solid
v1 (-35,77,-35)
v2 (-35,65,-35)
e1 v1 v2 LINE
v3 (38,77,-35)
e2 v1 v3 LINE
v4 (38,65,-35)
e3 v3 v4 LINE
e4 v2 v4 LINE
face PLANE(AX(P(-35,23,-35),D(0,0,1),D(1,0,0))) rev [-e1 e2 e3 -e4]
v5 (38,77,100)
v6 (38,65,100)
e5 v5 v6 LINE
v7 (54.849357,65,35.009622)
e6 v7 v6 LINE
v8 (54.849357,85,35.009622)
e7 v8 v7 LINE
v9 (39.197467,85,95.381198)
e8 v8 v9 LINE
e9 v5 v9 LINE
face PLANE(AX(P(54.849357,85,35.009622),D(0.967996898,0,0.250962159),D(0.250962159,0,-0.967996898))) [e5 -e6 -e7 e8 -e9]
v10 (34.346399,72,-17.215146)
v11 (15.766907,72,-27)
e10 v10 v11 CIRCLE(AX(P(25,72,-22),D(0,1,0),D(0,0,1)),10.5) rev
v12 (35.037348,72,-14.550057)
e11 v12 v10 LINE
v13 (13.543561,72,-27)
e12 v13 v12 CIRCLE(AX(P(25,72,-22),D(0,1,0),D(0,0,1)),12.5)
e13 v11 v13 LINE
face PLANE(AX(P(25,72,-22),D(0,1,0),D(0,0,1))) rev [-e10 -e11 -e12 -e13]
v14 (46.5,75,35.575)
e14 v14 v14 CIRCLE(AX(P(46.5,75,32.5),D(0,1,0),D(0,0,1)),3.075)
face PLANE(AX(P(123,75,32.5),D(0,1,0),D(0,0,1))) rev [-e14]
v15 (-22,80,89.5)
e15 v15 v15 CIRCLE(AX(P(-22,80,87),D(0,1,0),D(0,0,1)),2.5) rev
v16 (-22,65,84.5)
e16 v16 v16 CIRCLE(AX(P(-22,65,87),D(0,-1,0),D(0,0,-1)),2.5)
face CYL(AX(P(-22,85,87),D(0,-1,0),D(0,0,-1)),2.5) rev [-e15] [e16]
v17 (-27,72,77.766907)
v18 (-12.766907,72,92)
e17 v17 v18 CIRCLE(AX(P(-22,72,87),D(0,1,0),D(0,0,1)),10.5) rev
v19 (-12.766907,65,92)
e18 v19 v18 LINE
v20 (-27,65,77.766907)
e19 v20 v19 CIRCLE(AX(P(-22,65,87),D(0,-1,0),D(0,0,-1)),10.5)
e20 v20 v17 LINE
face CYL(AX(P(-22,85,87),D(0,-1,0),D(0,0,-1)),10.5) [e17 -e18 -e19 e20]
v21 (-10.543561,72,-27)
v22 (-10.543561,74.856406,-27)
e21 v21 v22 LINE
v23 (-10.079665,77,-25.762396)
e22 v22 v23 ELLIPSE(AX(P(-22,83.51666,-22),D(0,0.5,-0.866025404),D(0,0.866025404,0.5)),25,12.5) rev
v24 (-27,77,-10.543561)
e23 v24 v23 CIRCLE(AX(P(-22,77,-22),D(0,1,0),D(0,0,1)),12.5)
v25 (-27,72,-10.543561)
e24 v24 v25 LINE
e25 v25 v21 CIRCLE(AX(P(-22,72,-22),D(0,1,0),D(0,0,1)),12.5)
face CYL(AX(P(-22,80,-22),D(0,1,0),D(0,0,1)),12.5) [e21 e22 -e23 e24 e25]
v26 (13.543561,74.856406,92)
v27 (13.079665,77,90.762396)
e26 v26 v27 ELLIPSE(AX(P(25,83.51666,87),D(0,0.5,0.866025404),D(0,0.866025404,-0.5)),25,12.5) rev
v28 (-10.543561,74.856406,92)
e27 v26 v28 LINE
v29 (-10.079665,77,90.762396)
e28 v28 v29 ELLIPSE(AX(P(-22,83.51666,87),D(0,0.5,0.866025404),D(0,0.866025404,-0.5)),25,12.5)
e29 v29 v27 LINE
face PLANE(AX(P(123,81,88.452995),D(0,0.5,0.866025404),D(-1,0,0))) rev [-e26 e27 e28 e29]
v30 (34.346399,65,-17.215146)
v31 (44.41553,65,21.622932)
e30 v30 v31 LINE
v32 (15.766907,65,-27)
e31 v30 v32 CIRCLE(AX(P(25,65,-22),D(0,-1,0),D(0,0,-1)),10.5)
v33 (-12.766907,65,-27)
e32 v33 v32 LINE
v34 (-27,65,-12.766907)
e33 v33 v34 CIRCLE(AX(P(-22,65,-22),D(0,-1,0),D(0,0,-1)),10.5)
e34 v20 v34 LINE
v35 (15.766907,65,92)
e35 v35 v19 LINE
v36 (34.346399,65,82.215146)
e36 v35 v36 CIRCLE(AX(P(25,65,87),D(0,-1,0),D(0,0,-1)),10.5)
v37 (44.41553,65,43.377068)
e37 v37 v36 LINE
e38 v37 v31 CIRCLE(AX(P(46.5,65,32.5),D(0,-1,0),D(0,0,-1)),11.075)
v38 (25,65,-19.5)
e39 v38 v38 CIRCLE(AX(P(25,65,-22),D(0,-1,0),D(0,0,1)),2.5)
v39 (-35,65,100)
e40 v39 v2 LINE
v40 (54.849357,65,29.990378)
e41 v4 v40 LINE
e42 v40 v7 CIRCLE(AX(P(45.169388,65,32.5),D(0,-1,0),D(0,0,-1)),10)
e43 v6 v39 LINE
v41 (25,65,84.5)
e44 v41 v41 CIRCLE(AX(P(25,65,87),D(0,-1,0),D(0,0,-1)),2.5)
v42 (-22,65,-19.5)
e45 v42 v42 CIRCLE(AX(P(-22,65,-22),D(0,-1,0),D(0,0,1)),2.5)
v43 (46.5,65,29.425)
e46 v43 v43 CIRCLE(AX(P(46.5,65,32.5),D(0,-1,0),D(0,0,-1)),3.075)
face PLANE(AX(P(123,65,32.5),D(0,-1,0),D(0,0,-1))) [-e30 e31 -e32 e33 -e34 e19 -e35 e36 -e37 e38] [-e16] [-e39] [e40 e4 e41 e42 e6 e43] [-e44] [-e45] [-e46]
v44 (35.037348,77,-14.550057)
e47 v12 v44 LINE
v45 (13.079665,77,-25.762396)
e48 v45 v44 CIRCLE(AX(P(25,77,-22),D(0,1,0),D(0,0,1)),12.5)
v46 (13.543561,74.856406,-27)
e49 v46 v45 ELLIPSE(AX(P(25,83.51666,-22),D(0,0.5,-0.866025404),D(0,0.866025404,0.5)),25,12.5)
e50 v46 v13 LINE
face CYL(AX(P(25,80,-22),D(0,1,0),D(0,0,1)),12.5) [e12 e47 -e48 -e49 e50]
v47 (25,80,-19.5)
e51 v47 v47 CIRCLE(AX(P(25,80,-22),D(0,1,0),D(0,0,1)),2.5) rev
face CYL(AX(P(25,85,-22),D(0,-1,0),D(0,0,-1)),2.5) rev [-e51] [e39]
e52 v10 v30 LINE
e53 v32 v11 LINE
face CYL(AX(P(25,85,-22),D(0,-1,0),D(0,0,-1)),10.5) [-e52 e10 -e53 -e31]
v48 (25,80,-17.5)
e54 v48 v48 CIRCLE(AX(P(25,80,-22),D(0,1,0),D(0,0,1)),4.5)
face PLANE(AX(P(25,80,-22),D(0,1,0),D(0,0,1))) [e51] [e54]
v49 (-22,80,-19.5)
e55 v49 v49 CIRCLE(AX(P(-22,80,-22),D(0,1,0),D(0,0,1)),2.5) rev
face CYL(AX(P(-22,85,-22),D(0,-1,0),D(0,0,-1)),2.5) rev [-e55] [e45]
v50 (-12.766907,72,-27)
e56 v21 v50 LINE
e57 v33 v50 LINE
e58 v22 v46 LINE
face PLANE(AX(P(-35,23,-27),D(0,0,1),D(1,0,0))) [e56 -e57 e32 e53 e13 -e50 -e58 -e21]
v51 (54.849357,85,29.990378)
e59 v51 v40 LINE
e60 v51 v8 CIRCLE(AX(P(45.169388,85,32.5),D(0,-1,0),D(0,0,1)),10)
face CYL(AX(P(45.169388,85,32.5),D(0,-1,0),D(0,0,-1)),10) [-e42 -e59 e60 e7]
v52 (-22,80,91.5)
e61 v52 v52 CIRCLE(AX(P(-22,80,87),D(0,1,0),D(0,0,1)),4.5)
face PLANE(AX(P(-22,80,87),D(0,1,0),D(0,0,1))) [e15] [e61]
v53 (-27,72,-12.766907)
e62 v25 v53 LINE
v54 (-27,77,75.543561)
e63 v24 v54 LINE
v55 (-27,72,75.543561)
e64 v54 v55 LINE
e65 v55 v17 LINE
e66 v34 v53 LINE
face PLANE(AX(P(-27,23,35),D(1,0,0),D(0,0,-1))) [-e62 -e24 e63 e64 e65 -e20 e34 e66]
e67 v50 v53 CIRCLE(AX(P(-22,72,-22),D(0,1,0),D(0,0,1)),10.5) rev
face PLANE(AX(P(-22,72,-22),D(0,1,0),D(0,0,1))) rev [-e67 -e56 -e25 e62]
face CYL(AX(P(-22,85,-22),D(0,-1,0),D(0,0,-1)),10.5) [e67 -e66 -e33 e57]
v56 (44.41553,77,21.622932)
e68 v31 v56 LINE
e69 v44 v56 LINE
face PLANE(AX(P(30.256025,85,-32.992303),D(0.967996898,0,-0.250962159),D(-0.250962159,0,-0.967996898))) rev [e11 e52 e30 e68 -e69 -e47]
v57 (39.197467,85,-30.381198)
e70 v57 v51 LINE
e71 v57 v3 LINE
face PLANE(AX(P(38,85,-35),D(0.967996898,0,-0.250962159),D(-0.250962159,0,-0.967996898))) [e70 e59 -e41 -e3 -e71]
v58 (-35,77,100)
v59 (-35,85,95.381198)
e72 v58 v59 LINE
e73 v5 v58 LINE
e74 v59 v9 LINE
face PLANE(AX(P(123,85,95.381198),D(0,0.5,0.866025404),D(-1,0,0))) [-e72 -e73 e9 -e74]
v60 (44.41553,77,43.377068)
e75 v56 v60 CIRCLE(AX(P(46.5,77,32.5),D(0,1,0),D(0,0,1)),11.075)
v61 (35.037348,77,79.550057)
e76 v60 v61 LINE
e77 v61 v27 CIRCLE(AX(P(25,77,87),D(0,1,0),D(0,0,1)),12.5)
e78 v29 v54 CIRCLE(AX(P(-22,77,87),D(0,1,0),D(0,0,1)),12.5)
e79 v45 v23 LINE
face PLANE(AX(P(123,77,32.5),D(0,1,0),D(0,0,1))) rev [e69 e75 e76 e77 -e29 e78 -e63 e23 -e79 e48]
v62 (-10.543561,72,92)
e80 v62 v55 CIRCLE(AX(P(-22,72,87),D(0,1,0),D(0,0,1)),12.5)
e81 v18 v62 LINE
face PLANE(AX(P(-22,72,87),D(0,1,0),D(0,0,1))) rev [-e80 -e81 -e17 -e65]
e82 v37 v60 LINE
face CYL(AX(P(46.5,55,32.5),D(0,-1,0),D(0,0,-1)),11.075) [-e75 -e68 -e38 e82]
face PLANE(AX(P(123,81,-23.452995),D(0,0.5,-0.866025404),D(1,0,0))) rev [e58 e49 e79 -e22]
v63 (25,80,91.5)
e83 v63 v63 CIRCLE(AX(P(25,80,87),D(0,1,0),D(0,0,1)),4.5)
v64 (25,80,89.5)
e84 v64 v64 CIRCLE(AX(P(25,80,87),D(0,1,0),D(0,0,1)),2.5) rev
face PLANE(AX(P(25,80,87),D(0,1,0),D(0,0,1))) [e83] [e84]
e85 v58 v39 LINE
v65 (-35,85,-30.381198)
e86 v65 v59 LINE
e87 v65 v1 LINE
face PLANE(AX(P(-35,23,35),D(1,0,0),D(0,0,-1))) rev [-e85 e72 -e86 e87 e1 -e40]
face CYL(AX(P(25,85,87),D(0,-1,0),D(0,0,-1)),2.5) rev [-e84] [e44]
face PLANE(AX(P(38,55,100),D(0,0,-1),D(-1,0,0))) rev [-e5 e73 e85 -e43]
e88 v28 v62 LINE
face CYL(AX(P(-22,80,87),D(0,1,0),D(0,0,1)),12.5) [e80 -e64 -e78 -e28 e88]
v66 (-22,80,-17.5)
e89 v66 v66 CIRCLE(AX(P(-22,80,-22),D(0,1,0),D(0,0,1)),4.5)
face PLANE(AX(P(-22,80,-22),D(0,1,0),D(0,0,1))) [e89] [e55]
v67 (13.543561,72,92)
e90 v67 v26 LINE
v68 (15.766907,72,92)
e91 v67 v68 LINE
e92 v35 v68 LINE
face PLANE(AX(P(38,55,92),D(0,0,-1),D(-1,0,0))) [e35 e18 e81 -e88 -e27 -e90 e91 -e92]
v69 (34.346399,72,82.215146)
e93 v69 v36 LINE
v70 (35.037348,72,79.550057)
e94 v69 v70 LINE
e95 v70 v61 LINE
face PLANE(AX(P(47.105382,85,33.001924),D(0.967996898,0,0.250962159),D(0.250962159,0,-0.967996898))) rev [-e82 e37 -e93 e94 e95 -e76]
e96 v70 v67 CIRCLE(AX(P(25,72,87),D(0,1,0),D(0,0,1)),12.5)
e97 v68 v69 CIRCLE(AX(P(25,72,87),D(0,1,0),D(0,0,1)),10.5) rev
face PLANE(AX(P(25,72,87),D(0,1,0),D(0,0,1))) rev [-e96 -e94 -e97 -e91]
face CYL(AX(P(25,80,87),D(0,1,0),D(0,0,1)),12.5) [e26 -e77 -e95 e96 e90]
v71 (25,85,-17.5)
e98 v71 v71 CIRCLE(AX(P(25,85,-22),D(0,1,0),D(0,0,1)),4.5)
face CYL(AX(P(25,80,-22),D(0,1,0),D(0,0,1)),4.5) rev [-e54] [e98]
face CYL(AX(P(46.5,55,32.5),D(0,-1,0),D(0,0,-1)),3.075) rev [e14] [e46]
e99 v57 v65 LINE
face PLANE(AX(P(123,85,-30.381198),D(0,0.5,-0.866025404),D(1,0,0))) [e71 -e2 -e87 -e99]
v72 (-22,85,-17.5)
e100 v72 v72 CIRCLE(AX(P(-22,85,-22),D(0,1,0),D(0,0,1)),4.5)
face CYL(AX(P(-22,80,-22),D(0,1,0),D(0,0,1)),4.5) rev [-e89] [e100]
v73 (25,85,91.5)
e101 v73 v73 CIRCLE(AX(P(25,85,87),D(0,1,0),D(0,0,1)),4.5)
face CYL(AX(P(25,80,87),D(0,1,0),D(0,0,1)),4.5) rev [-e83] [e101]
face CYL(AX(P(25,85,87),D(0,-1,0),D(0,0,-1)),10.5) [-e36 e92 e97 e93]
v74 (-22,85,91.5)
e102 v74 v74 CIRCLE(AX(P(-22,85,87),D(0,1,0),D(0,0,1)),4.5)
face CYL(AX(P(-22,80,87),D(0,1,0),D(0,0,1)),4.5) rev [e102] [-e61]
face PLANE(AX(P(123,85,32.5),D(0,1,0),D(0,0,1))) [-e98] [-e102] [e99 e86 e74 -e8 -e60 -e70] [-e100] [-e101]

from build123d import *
from OCP.BRepFilletAPI import BRepFilletAPI_MakeChamfer

# Parameters (mm, degrees)
SALIENTE_EXTRUIR2_DEPTH     = 23
CROQUIS7_R                  = 20
CORTAR_EXTRUIR1_DEPTH       = 16
CROQUIS8_R                  = 10.25
CORTAR_EXTRUIR2_DEPTH       = 65.838641661
SALIENTE_EXTRUIR3_START     = 32
CROQUIS9_R                  = 20
CROQUIS9_R_2                = 3.075
CROQUIS9_R_3                = 10.25
SALIENTE_EXTRUIR3_DEPTH     = 32
CORTAR_EXTRUIR3_START       = -7
CROQUIS10_R                 = 20
CORTAR_EXTRUIR3_DEPTH       = 112.607172695
SALIENTE_EXTRUIR4_START     = 20
CROQUIS11_R                 = 3.075
CROQUIS11_R_2               = 20
SALIENTE_EXTRUIR4_DEPTH     = 20
CROQUIS12_R                 = 63
CORTAR_EXTRUIR4_DEPTH       = 3
CROQUIS13_R                 = 55
CORTAR_EXTRUIR5_DEPTH       = 10
SALIENTE_EXTRUIR5_START     = 10
SALIENTE_EXTRUIR5_DEPTH     = 10
CHAFL_N1_SIZE               = 8
CHAFL_N1_SIZE2              = 4.618802154
CROQUIS15_R                 = 6
CORTAR_EXTRUIR6_DEPTH       = 14.8
CORTAR_EXTRUIR7_REACH       = 233.334
CROQUIS17_R                 = 1.5
CORTAR_EXTRUIR9_REACH       = 225.907
CROQUIS19_R                 = 1.5
CORTAR_EXTRUIR10_START      = -50
CORTAR_EXTRUIR10_DEPTH      = 50
CROQUIS22_R                 = 3
CORTAR_EXTRUIR12_DEPTH      = 3
CROQUIS23_R                 = 3
CORTAR_EXTRUIR13_DEPTH      = 3
CROQUIS25_R                 = 2.5
CORTAR_EXTRUIR15_DEPTH      = 30
CROQUIS24_R                 = 2.5
CORTAR_EXTRUIR14_DEPTH      = 30
CROQUIS26_R                 = 2
CORTAR_EXTRUIR16_DEPTH      = 223.070371729
CROQUIS27_R                 = 3.5
CORTAR_EXTRUIR17_DEPTH      = 5
CORTAR_EXTRUIR18_DEPTH      = 3.25
CORTAR_EXTRUIR20_DEPTH      = 223.070371729
CORTAR_EXTRUIR20_DEPTH_BACK = 10
CROQUIS31_R                 = 2.5
CORTAR_EXTRUIR21_DEPTH      = 217.079267863
CROQUIS32_R                 = 4.5
CORTAR_EXTRUIR22_DEPTH      = 5
SALIENTE_EXTRUIR6_START     = 4
CROQUIS33_R                 = 55
CROQUIS33_R_2               = 6
SALIENTE_EXTRUIR6_DEPTH     = 4
SALIENTE_EXTRUIR7_START     = 3.35
CROQUIS34_R                 = 16.85
CROQUIS34_R_2               = 6
SALIENTE_EXTRUIR7_DEPTH     = 3.35
SALIENTE_EXTRUIR8_START     = 29
CROQUIS35_R                 = 10
CROQUIS35_R_2               = 6
SALIENTE_EXTRUIR8_DEPTH     = 29
CORTAR_EXTRUIR23_DEPTH      = 218.721088781
CORTAR_EXTRUIR23_DEPTH_BACK = 218.721088781
CROQUIS36_OUTSIDE_W         = 281.136
CROQUIS36_OUTSIDE_H         = 190.636
SALIENTE_EXTRUIR9_REACH     = 117.947
CROQUIS37_R                 = 20
VACIADO1_START              = 65
VACIADO1_DEPTH              = 12
VACIADO1_2_DEPTH            = 7
VACIADO1_START_2            = -12.766907344
VACIADO1_3_DEPTH            = 28.533814688


with BuildPart() as part:
    # Croquis2 → Saliente-Extruir2 (new body)
    with BuildSketch(Plane(origin=(0, 0, 0), x_dir=(1, 0, 0), z_dir=(0, 1, 0))):
        with BuildLine():
            Line((32.725022686, -35), (-35, -35))
            Line((-35, -35), (-35, 35))
            Line((-35, 35), (38, 35))
            Line((38, 35), (52.182846342, -19.705264464))
            ThreePointArc((52.182846342, -19.705264464), (38.869791903, -20.762030653), (32.5, -32.5))
            ThreePointArc((32.5, -32.5), (32.556369153, -33.755053307), (32.725022686, -35))
        make_face()
    extrude(amount=SALIENTE_EXTRUIR2_DEPTH)

    # Croquis7 → Cortar-Extruir1 (cut)
    with BuildSketch(Plane(origin=(0, 23, 0), x_dir=(1, 0, 0), z_dir=(0, 1, 0))):
        with Locations(Location((1.5, -1.5, 0), (0, 0, 270))):
            Circle(CROQUIS7_R)
    extrude(amount=-CORTAR_EXTRUIR1_DEPTH, mode=Mode.SUBTRACT)

    # Croquis8 → Cortar-Extruir2 (cut, through all)
    with BuildSketch(Plane(origin=(0, 7, 0), x_dir=(1, 0, 0), z_dir=(0, 1, 0))):
        with Locations(Location((1.5, -1.5, 0), (0, 0, 270))):
            Circle(CROQUIS8_R)
    extrude(amount=-CORTAR_EXTRUIR2_DEPTH, mode=Mode.SUBTRACT)

    # Croquis9 → Saliente-Extruir3 (add)
    with BuildSketch(Plane(origin=(0, 23, 0), x_dir=(1, 0, 0), z_dir=(0, 1, 0)).offset(SALIENTE_EXTRUIR3_START)):
        with BuildLine():
            Line((-35, 35), (-35, -100))
            Line((-35, -100), (38, -100))
            Line((38, -100), (54.849357366, -35.009621588))
            ThreePointArc((54.849357366, -35.009621588), (55.169388384, -32.5), (54.849357366, -29.990378412))
            Line((54.849357366, -29.990378412), (38, 35))
            Line((38, 35), (-35, 35))
        make_face()
        with Locations(Location((1.5, -1.5, 0), (0, 0, 270))):
            Circle(CROQUIS9_R, mode=Mode.SUBTRACT)
        with Locations(Location((46.5, -32.5, 0), (0, 0, 270))):
            Circle(CROQUIS9_R_2, mode=Mode.SUBTRACT)
        with Locations(Location((1.5, -63.5, 0), (0, 0, 90))):
            Circle(CROQUIS9_R_3, mode=Mode.SUBTRACT)
    extrude(amount=-SALIENTE_EXTRUIR3_DEPTH)

    # Croquis10 → Cortar-Extruir3 (cut, through all)
    with BuildSketch(Plane.XZ.offset(-23).offset(CORTAR_EXTRUIR3_START)):
        with Locations(Location((1.5, 63.5, 0), (0, 0, 90))):
            Circle(CROQUIS10_R)
    extrude(amount=-CORTAR_EXTRUIR3_DEPTH, mode=Mode.SUBTRACT)

    # Croquis11 → Saliente-Extruir4 (add)
    with BuildSketch(Plane(origin=(0, 55, 0), x_dir=(1, 0, 0), z_dir=(0, 1, 0)).offset(SALIENTE_EXTRUIR4_START)):
        with BuildLine():
            Line((123, 35), (-35, 35))
            Line((-35, 35), (-35, -100))
            Line((-35, -100), (123, -100))
            ThreePointArc((123, -100), (190.5, -32.5), (123, 35))
        make_face()
        with Locations(Location((46.5, -32.5, 0), (0, 0, 270))):
            Circle(CROQUIS11_R, mode=Mode.SUBTRACT)
        with Locations(Location((1.5, -63.5, 0), (0, 0, 270))):
            Circle(CROQUIS11_R_2, mode=Mode.SUBTRACT)
        with Locations(Location((1.5, -1.5, 0), (0, 0, 270))):
            Circle(CROQUIS11_R_2, mode=Mode.SUBTRACT)
    extrude(amount=-SALIENTE_EXTRUIR4_DEPTH)

    # Croquis12 → Cortar-Extruir4 (cut)
    with BuildSketch(Plane.XZ.offset(-55)):
        with Locations(Location((123, 32.5, 0), (0, 0, 270))):
            Circle(CROQUIS12_R)
    extrude(amount=-CORTAR_EXTRUIR4_DEPTH, mode=Mode.SUBTRACT)

    # Croquis13 → Cortar-Extruir5 (cut)
    with BuildSketch(Plane.XZ.offset(-58)):
        with Locations(Location((123, 32.5, 0), (0, 0, 270))):
            Circle(CROQUIS13_R)
    extrude(amount=-CORTAR_EXTRUIR5_DEPTH, mode=Mode.SUBTRACT)

    # Croquis14 → Saliente-Extruir5 (add)
    with BuildSketch(Plane(origin=(0, 75, 0), x_dir=(1, 0, 0), z_dir=(0, 1, 0)).offset(SALIENTE_EXTRUIR5_START)):
        with BuildLine():
            Line((-35, -100), (123, -100))
            ThreePointArc((123, -100), (190.5, -32.5), (123, 35))
            Line((123, 35), (-35, 35))
            Line((-35, 35), (-35, -100))
        make_face()
    extrude(amount=-SALIENTE_EXTRUIR5_DEPTH)

    # Chaflán1: one chamfer whose edges measure the first distance from different faces: ONE call of the kernel's chamfer builder (chamfer() names one face for all edges)
    chafl_n1_edges_1 = [part.edges().sort_by_distance(p)[0] for p in [
        (190.5, 85, 32.5),
    ]]
    chafl_n1_side_1 = [part.faces().sort_by_distance(p)[0] for p in [
        (190.5, 70, 32.5),
    ]]
    chafl_n1_edges_2 = [part.edges().sort_by_distance(p)[0] for p in [
        (44, 85, -35),
    ]]
    chafl_n1_side_2 = [part.faces().sort_by_distance(p)[0] for p in [
        (24.509708738, 50.509708738, -35),
    ]]
    chafl_n1_edges_3 = [part.edges().sort_by_distance(p)[0] for p in [
        (44, 85, 100),
    ]]
    chafl_n1_side_3 = [part.faces().sort_by_distance(p)[0] for p in [
        (29.969474279, 59.765969474, 100),
    ]]
    chafl_n1 = BRepFilletAPI_MakeChamfer(part.part.solid().wrapped)
    for e in chafl_n1_edges_1:
        chafl_n1.Add(CHAFL_N1_SIZE, CHAFL_N1_SIZE2, e.wrapped, chafl_n1_side_1[0].wrapped)  # the first distance lies on this face
    for e in chafl_n1_edges_2:
        chafl_n1.Add(CHAFL_N1_SIZE, CHAFL_N1_SIZE2, e.wrapped, chafl_n1_side_2[0].wrapped)  # the first distance lies on this face
    for e in chafl_n1_edges_3:
        chafl_n1.Add(CHAFL_N1_SIZE, CHAFL_N1_SIZE2, e.wrapped, chafl_n1_side_3[0].wrapped)  # the first distance lies on this face
    add(Compound.cast(chafl_n1.Shape()), mode=Mode.REPLACE)

    # Croquis15 → Cortar-Extruir6 (cut)
    with BuildSketch(Plane.XZ.offset(-68)):
        with Locations(Location((123, 32.5, 0), (0, 0, 270))):
            Circle(CROQUIS15_R)
    extrude(amount=-CORTAR_EXTRUIR6_DEPTH, mode=Mode.SUBTRACT)

    # Croquis17 → Cortar-Extruir7 (cut, up to next)
    with BuildSketch(Plane.XZ, mode=Mode.PRIVATE) as cortar_extruir7_sk1:
        with Locations(Location((16.5, 1.5, 0), (0, 0, 270))):
            Circle(CROQUIS17_R)
    cortar_extruir7_tool1 = extrude(cortar_extruir7_sk1.sketch, amount=-CORTAR_EXTRUIR7_REACH, mode=Mode.PRIVATE) & part.part
    # Croquis17 → Cortar-Extruir7 (cut, up to next)
    with BuildSketch(Plane.XZ, mode=Mode.PRIVATE) as cortar_extruir7_sk2:
        with Locations(Location((-6, -11.490381057, 0), (0, 0, 270))):
            Circle(CROQUIS17_R)
    cortar_extruir7_tool2 = extrude(cortar_extruir7_sk2.sketch, amount=-CORTAR_EXTRUIR7_REACH, mode=Mode.PRIVATE) & part.part
    # Croquis17 → Cortar-Extruir7 (cut, up to next)
    with BuildSketch(Plane.XZ, mode=Mode.PRIVATE) as cortar_extruir7_sk3:
        with Locations(Location((-6, 14.490381057, 0), (0, 0, 270))):
            Circle(CROQUIS17_R)
    cortar_extruir7_tool3 = extrude(cortar_extruir7_sk3.sketch, amount=-CORTAR_EXTRUIR7_REACH, mode=Mode.PRIVATE) & part.part
    # Croquis17 → Cortar-Extruir7 (cut, up to next)
    with BuildSketch(Plane.XZ, mode=Mode.PRIVATE) as cortar_extruir7_sk4:
        with Locations(Location((13.624355653, 8.5, 0), (0, 0, 270))):
            Circle(CROQUIS17_R)
    cortar_extruir7_tool4 = extrude(cortar_extruir7_sk4.sketch, amount=-CORTAR_EXTRUIR7_REACH, mode=Mode.PRIVATE) & part.part
    # Croquis17 → Cortar-Extruir7 (cut, up to next)
    with BuildSketch(Plane.XZ, mode=Mode.PRIVATE) as cortar_extruir7_sk5:
        with Locations(Location((1.5, -12.5, 0), (0, 0, 270))):
            Circle(CROQUIS17_R)
    cortar_extruir7_tool5 = extrude(cortar_extruir7_sk5.sketch, amount=-CORTAR_EXTRUIR7_REACH, mode=Mode.PRIVATE) & part.part
    # Croquis17 → Cortar-Extruir7 (cut, up to next)
    with BuildSketch(Plane.XZ, mode=Mode.PRIVATE) as cortar_extruir7_sk6:
        with Locations(Location((-10.624355653, 8.5, 0), (0, 0, 270))):
            Circle(CROQUIS17_R)
    cortar_extruir7_tool6 = extrude(cortar_extruir7_sk6.sketch, amount=-CORTAR_EXTRUIR7_REACH, mode=Mode.PRIVATE) & part.part
    add(cortar_extruir7_tool1.solids().sort_by_distance((16.5, 0, 1.5))[0], mode=Mode.SUBTRACT)
    add(cortar_extruir7_tool2.solids().sort_by_distance((-6, 0, -11.490381))[0], mode=Mode.SUBTRACT)
    add(cortar_extruir7_tool3.solids().sort_by_distance((-6, 0, 14.490381))[0], mode=Mode.SUBTRACT)
    add(cortar_extruir7_tool4.solids().sort_by_distance((13.624356, 0, 8.5))[0], mode=Mode.SUBTRACT)
    add(cortar_extruir7_tool5.solids().sort_by_distance((1.5, 0, -12.5))[0], mode=Mode.SUBTRACT)
    add(cortar_extruir7_tool6.solids().sort_by_distance((-10.624356, 0, 8.5))[0], mode=Mode.SUBTRACT)

    # Croquis19 → Cortar-Extruir9 (cut, up to next)
    with BuildSketch(Plane.XZ.offset(-23), mode=Mode.PRIVATE) as cortar_extruir9_sk1:
        with Locations(Location((16.5, 63.5, 0), (0, 0, 270))):
            Circle(CROQUIS19_R)
    cortar_extruir9_tool1 = extrude(cortar_extruir9_sk1.sketch, amount=-CORTAR_EXTRUIR9_REACH, mode=Mode.PRIVATE) & part.part
    # Croquis19 → Cortar-Extruir9 (cut, up to next)
    with BuildSketch(Plane.XZ.offset(-23), mode=Mode.PRIVATE) as cortar_extruir9_sk2:
        with Locations(Location((-6, 50.509618943, 0), (0, 0, 270))):
            Circle(CROQUIS19_R)
    cortar_extruir9_tool2 = extrude(cortar_extruir9_sk2.sketch, amount=-CORTAR_EXTRUIR9_REACH, mode=Mode.PRIVATE) & part.part
    # Croquis19 → Cortar-Extruir9 (cut, up to next)
    with BuildSketch(Plane.XZ.offset(-23), mode=Mode.PRIVATE) as cortar_extruir9_sk3:
        with Locations(Location((-6, 76.490381057, 0), (0, 0, 270))):
            Circle(CROQUIS19_R)
    cortar_extruir9_tool3 = extrude(cortar_extruir9_sk3.sketch, amount=-CORTAR_EXTRUIR9_REACH, mode=Mode.PRIVATE) & part.part
    # Croquis19 → Cortar-Extruir9 (cut, up to next)
    with BuildSketch(Plane.XZ.offset(-23), mode=Mode.PRIVATE) as cortar_extruir9_sk4:
        with Locations(Location((13.624355653, 70.5, 0), (0, 0, 270))):
            Circle(CROQUIS19_R)
    cortar_extruir9_tool4 = extrude(cortar_extruir9_sk4.sketch, amount=-CORTAR_EXTRUIR9_REACH, mode=Mode.PRIVATE) & part.part
    # Croquis19 → Cortar-Extruir9 (cut, up to next)
    with BuildSketch(Plane.XZ.offset(-23), mode=Mode.PRIVATE) as cortar_extruir9_sk5:
        with Locations(Location((1.5, 49.5, 0), (0, 0, 270))):
            Circle(CROQUIS19_R)
    cortar_extruir9_tool5 = extrude(cortar_extruir9_sk5.sketch, amount=-CORTAR_EXTRUIR9_REACH, mode=Mode.PRIVATE) & part.part
    # Croquis19 → Cortar-Extruir9 (cut, up to next)
    with BuildSketch(Plane.XZ.offset(-23), mode=Mode.PRIVATE) as cortar_extruir9_sk6:
        with Locations(Location((-10.624355653, 70.5, 0), (0, 0, 270))):
            Circle(CROQUIS19_R)
    cortar_extruir9_tool6 = extrude(cortar_extruir9_sk6.sketch, amount=-CORTAR_EXTRUIR9_REACH, mode=Mode.PRIVATE) & part.part
    add(cortar_extruir9_tool1.solids().sort_by_distance((16.5, 23, 63.5))[0], mode=Mode.SUBTRACT)
    add(cortar_extruir9_tool2.solids().sort_by_distance((-6, 23, 50.509619))[0], mode=Mode.SUBTRACT)
    add(cortar_extruir9_tool3.solids().sort_by_distance((-6, 23, 76.490381))[0], mode=Mode.SUBTRACT)
    add(cortar_extruir9_tool4.solids().sort_by_distance((13.624356, 23, 70.5))[0], mode=Mode.SUBTRACT)
    add(cortar_extruir9_tool5.solids().sort_by_distance((1.5, 23, 49.5))[0], mode=Mode.SUBTRACT)
    add(cortar_extruir9_tool6.solids().sort_by_distance((-10.624356, 23, 70.5))[0], mode=Mode.SUBTRACT)

    # Croquis20 → Cortar-Extruir10 (cut)
    with BuildSketch(Plane.XZ.offset(CORTAR_EXTRUIR10_START)):
        with BuildLine():
            Line((42.3656995, 5.747113524), (39.773106907, -4.252886476))
            ThreePointArc((39.773106907, -4.252886476), (38.705054743, -5.872620854), (36.869116213, -6.5))
            Line((36.869116213, -6.5), (19.83030278, -6.5))
            ThreePointArc((19.83030278, -6.5), (21.5, 1.5), (19.83030278, 9.5))
            Line((19.83030278, 9.5), (39.461708805, 9.5))
            ThreePointArc((39.461708805, 9.5), (41.834329659, 8.33593853), (42.3656995, 5.747113524))
        make_face()
    extrude(amount=CORTAR_EXTRUIR10_DEPTH, mode=Mode.SUBTRACT)

    # Croquis22 → Cortar-Extruir12 (cut)
    with BuildSketch(Plane.XZ):
        with Locations(Location((-6, 14.490381057, 0), (0, 0, 270))):
            Circle(CROQUIS22_R)
        with Locations(Location((-10.624355653, 8.5, 0), (0, 0, 270))):
            Circle(CROQUIS22_R)
        with Locations(Location((-6, -11.490381057, 0), (0, 0, 270))):
            Circle(CROQUIS22_R)
        with Locations(Location((1.5, -12.5, 0), (0, 0, 270))):
            Circle(CROQUIS22_R)
        with Locations(Location((16.5, 1.5, 0), (0, 0, 270))):
            Circle(CROQUIS22_R)
        with Locations(Location((13.624355653, 8.5, 0), (0, 0, 270))):
            Circle(CROQUIS22_R)
    extrude(amount=-CORTAR_EXTRUIR12_DEPTH, mode=Mode.SUBTRACT)

    # Croquis23 → Cortar-Extruir13 (cut)
    with BuildSketch(Plane.XZ.offset(-23)):
        with Locations(Location((-6, 76.490381057, 0), (0, 0, 270))):
            Circle(CROQUIS23_R)
        with Locations(Location((-10.624355653, 70.5, 0), (0, 0, 270))):
            Circle(CROQUIS23_R)
        with Locations(Location((-6, 50.509618943, 0), (0, 0, 270))):
            Circle(CROQUIS23_R)
        with Locations(Location((1.5, 49.5, 0), (0, 0, 270))):
            Circle(CROQUIS23_R)
        with Locations(Location((16.5, 63.5, 0), (0, 0, 270))):
            Circle(CROQUIS23_R)
        with Locations(Location((13.624355653, 70.5, 0), (0, 0, 270))):
            Circle(CROQUIS23_R)
    extrude(amount=-CORTAR_EXTRUIR13_DEPTH, mode=Mode.SUBTRACT)

    # Croquis25 → Cortar-Extruir15 (cut)
    with BuildSketch(Plane.XZ.offset(-23)):
        with Locations(Location((-28.75, 63.5, 0), (0, 0, 270))):
            Circle(CROQUIS25_R)
        with Locations(Location((29, 47, 0), (0, 0, 270))):
            Circle(CROQUIS25_R)
    extrude(amount=-CORTAR_EXTRUIR15_DEPTH, mode=Mode.SUBTRACT)

    # Croquis24 → Cortar-Extruir14 (cut)
    with BuildSketch(Plane.XZ):
        with Locations(Location((-28.75, 1.5, 0), (0, 0, 270))):
            Circle(CROQUIS24_R)
        with Locations(Location((25, 25, 0), (0, 0, 270))):
            Circle(CROQUIS24_R)
    extrude(amount=-CORTAR_EXTRUIR14_DEPTH, mode=Mode.SUBTRACT)

    # Croquis26 → Cortar-Extruir16 (cut, through all)
    with BuildSketch(Plane.XZ.offset(-55)):
        with Locations(Location((54.186793756, 85.381197846, 0), (0, 0, 270))):
            Circle(CROQUIS26_R)
        with Locations(Location((58.853460423, 67.381197846, 0), (0, 0, 270))):
            Circle(CROQUIS26_R)
        with Locations(Location((58.853460423, -2.381197846, 0), (0, 0, 90))):
            Circle(CROQUIS26_R)
        with Locations(Location((54.186793756, -20.381197846, 0), (0, 0, 90))):
            Circle(CROQUIS26_R)
    extrude(amount=-CORTAR_EXTRUIR16_DEPTH, mode=Mode.SUBTRACT)

    # Croquis27 → Cortar-Extruir17 (cut)
    with BuildSketch(Plane(origin=(0, 85, 0), x_dir=(1, 0, 0), z_dir=(0, 1, 0))):
        with Locations(Location((54.186793756, 20.381197846, 0), (0, 0, 270))):
            Circle(CROQUIS27_R)
        with Locations(Location((58.853460423, 2.381197846, 0), (0, 0, 270))):
            Circle(CROQUIS27_R)
        with Locations(Location((58.853460423, -67.381197846, 0), (0, 0, 270))):
            Circle(CROQUIS27_R)
        with Locations(Location((54.186793756, -85.381197846, 0), (0, 0, 270))):
            Circle(CROQUIS27_R)
    extrude(amount=-CORTAR_EXTRUIR17_DEPTH, mode=Mode.SUBTRACT)

    # Croquis28 → Cortar-Extruir18 (cut)
    with BuildSketch(Plane.XZ.offset(-55)):
        Polygon((55.222779206, 81.385253968), (58.165375392, 84.280415625), (57.129389942, 88.276359503), (53.150808306, 89.377141725), (50.20821212, 86.481980068), (51.24419757, 82.48603619), align=None)
        Polygon((59.889445873, 63.385253968), (62.832042059, 66.280415625), (61.796056609, 70.276359503), (57.817474973, 71.377141725), (54.874878787, 68.481980068), (55.910864237, 64.48603619), align=None)
        Polygon((59.889445873, 1.614746032), (55.910864237, 0.51396381), (54.874878787, -3.481980068), (57.817474973, -6.377141725), (61.796056609, -5.276359503), (62.832042059, -1.280415625), align=None)
        Polygon((55.222779206, -16.385253968), (51.24419757, -17.48603619), (50.20821212, -21.481980068), (53.150808306, -24.377141725), (57.129389942, -23.276359503), (58.165375392, -19.280415625), align=None)
    extrude(amount=-CORTAR_EXTRUIR18_DEPTH, mode=Mode.SUBTRACT)

    # Croquis30 → Cortar-Extruir20 (cut, two sides: drawn at the far end of the back side and taken through both)
    with BuildSketch(Plane.XZ.offset(-55).offset(-CORTAR_EXTRUIR20_DEPTH_BACK)):
        with BuildLine():
            Line((123, 100), (-35, 100))
            Line((-35, 100), (-35, -35))
            Line((-35, -35), (123, -35))
            ThreePointArc((123, -35), (55.5, 32.5), (123, 100))
        make_face()
    extrude(amount=CORTAR_EXTRUIR20_DEPTH + CORTAR_EXTRUIR20_DEPTH_BACK, mode=Mode.SUBTRACT)

    # Croquis31 → Cortar-Extruir21 (cut, through all)
    with BuildSketch(Plane.XZ.offset(-65)):
        with Locations(Location((-22, 87, 0), (0, 0, 270))):
            Circle(CROQUIS31_R)
        with Locations(Location((25, 87, 0), (0, 0, 270))):
            Circle(CROQUIS31_R)
        with Locations(Location((25, -22, 0), (0, 0, 90))):
            Circle(CROQUIS31_R)
        with Locations(Location((-22, -22, 0), (0, 0, 90))):
            Circle(CROQUIS31_R)
    extrude(amount=-CORTAR_EXTRUIR21_DEPTH, mode=Mode.SUBTRACT)

    # Croquis32 → Cortar-Extruir22 (cut)
    with BuildSketch(Plane(origin=(0, 85, 0), x_dir=(1, 0, 0), z_dir=(0, 1, 0))):
        with Locations(Location((-22, 22, 0), (0, 0, 270))):
            Circle(CROQUIS32_R)
        with Locations(Location((25, 22, 0), (0, 0, 270))):
            Circle(CROQUIS32_R)
        with Locations(Location((-22, -87, 0), (0, 0, 270))):
            Circle(CROQUIS32_R)
        with Locations(Location((25, -87, 0), (0, 0, 270))):
            Circle(CROQUIS32_R)
    extrude(amount=-CORTAR_EXTRUIR22_DEPTH, mode=Mode.SUBTRACT)

    # Croquis33 → Saliente-Extruir6 (add)
    with BuildSketch(Plane.XZ.offset(-68).offset(SALIENTE_EXTRUIR6_START)):
        with Locations(Location((123, 32.5, 0), (0, 0, 270))):
            Circle(CROQUIS33_R)
        with Locations(Location((123, 32.5, 0), (0, 0, 270))):
            Circle(CROQUIS33_R_2, mode=Mode.SUBTRACT)
    extrude(amount=-SALIENTE_EXTRUIR6_DEPTH)

    # Croquis34 → Saliente-Extruir7 (add)
    with BuildSketch(Plane.XZ.offset(-64).offset(SALIENTE_EXTRUIR7_START)):
        with Locations(Location((123, 32.5, 0), (0, 0, 270))):
            Circle(CROQUIS34_R)
        with Locations(Location((123, 32.5, 0), (0, 0, 270))):
            Circle(CROQUIS34_R_2, mode=Mode.SUBTRACT)
    extrude(amount=-SALIENTE_EXTRUIR7_DEPTH)

    # Croquis35 → Saliente-Extruir8 (add)
    with BuildSketch(Plane.XZ.offset(-60.65).offset(SALIENTE_EXTRUIR8_START)):
        with Locations(Location((123, 32.5, 0), (0, 0, 90))):
            Circle(CROQUIS35_R)
        with Locations(Location((123, 32.5, 0), (0, 0, 270))):
            Circle(CROQUIS35_R_2, mode=Mode.SUBTRACT)
    extrude(amount=-SALIENTE_EXTRUIR8_DEPTH)

    # Croquis36 outside → Cortar-Extruir23 (cut, two sides: drawn at the far end of the back side and taken through both)
    with BuildSketch(Plane.XZ.offset(-65).offset(-CORTAR_EXTRUIR23_DEPTH_BACK)):
        with Locations((77.75, 32.5)):
            Rectangle(CROQUIS36_OUTSIDE_W, CROQUIS36_OUTSIDE_H)
        with BuildLine():
            Line((38, -35), (54.849357366, 29.990378412))
            ThreePointArc((54.849357366, 29.990378412), (55.169388384, 32.5), (54.849357366, 35.009621588))
            Line((54.849357366, 35.009621588), (38, 100))
            Line((38, 100), (-35, 100))
            Line((-35, 100), (-35, -35))
            Line((-35, -35), (38, -35))
        make_face(mode=Mode.SUBTRACT)
    extrude(amount=CORTAR_EXTRUIR23_DEPTH + CORTAR_EXTRUIR23_DEPTH_BACK, mode=Mode.SUBTRACT)

    # Croquis37 → Saliente-Extruir9 (add, up to next)
    with BuildSketch(Plane.XZ.offset(-65), mode=Mode.PRIVATE) as saliente_extruir9_sk1:
        with Locations((1.5, 1.5)):
            Circle(CROQUIS37_R)
    saliente_extruir9_tool1 = extrude(saliente_extruir9_sk1.sketch, amount=-SALIENTE_EXTRUIR9_REACH, mode=Mode.PRIVATE) - part.part
    # Croquis37 → Saliente-Extruir9 (add, up to next)
    with BuildSketch(Plane.XZ.offset(-65), mode=Mode.PRIVATE) as saliente_extruir9_sk2:
        with Locations((1.5, 63.5)):
            Circle(CROQUIS37_R)
    saliente_extruir9_tool2 = extrude(saliente_extruir9_sk2.sketch, amount=-SALIENTE_EXTRUIR9_REACH, mode=Mode.PRIVATE) - part.part
    add(saliente_extruir9_tool1.solids().sort_by_distance((1.5, 65, 1.5))[0])
    add(saliente_extruir9_tool2.solids().sort_by_distance((1.5, 65, 63.5))[0])

    # Vaciado1: read off the stored shape, not the designer's step
    # Vaciado1 outline → Vaciado1 (cut)
    with BuildSketch(Plane(origin=(0, 0, 0), x_dir=(1, 0, 0), z_dir=(0, 1, 0)).offset(VACIADO1_START)):
        with BuildLine():
            Line((-27, 10.543560763), (-27, -75.543560763))
            ThreePointArc((-27, -75.543560763), (-13.161165235, -78.161165235), (-10.543560763, -92))
            Line((-10.543560763, -92), (13.543560763, -92))
            ThreePointArc((13.543560763, -92), (18.73472068, -76.183518361), (35.037347766, -79.550057059))
            Line((35.037347766, -79.550057059), (44.415530092, -43.377068089))
            ThreePointArc((44.415530092, -43.377068089), (35.425, -32.5), (44.415530092, -21.622931911))
            Line((44.415530092, -21.622931911), (35.037347766, 14.550057059))
            ThreePointArc((35.037347766, 14.550057059), (18.73472068, 11.183518361), (13.543560763, 27))
            Line((13.543560763, 27), (-10.543560763, 27))
            ThreePointArc((-10.543560763, 27), (-13.161165235, 13.161165235), (-27, 10.543560763))
        make_face()
    extrude(amount=VACIADO1_DEPTH, mode=Mode.SUBTRACT)

    # Vaciado1 2 outline → Vaciado1 2 (cut)
    with BuildSketch(Plane(origin=(0, 0, 0), x_dir=(1, 0, 0), z_dir=(0, 1, 0)).offset(VACIADO1_START)):
        with BuildLine():
            Line((-27, -75.543560763), (-27, -77.766907344))
            ThreePointArc((-27, -77.766907344), (-14.575378798, -79.575378798), (-12.766907344, -92))
            Line((-12.766907344, -92), (-10.543560763, -92))
            ThreePointArc((-10.543560763, -92), (-13.161165235, -78.161165235), (-27, -75.543560763))
        make_face()
        with BuildLine():
            Line((-27, 12.766907344), (-27, 10.543560763))
            ThreePointArc((-27, 10.543560763), (-13.161165235, 13.161165235), (-10.543560763, 27))
            Line((-10.543560763, 27), (-12.766907344, 27))
            ThreePointArc((-12.766907344, 27), (-14.575378798, 14.575378798), (-27, 12.766907344))
        make_face()
        with BuildLine():
            ThreePointArc((35.037347766, -79.550057059), (18.73472068, -76.183518361), (13.543560763, -92))
            Line((13.543560763, -92), (15.766907344, -92))
            ThreePointArc((15.766907344, -92), (20.107244927, -77.70963145), (34.346398818, -82.21514586))
            Line((34.346398818, -82.21514586), (35.037347766, -79.550057059))
        make_face()
        with BuildLine():
            Line((15.766907344, 27), (13.543560763, 27))
            ThreePointArc((13.543560763, 27), (18.73472068, 11.183518361), (35.037347766, 14.550057059))
            Line((35.037347766, 14.550057059), (34.346398818, 17.21514586))
            ThreePointArc((34.346398818, 17.21514586), (20.107244927, 12.70963145), (15.766907344, 27))
        make_face()
    extrude(amount=VACIADO1_2_DEPTH, mode=Mode.SUBTRACT)

    # Vaciado1 3 outline → Vaciado1 3 (add)
    with BuildSketch(Plane.YZ.offset(VACIADO1_START_2)):
        Polygon((77, -27), (77, -25.762395693), (74.856406461, -27), align=None)
        Polygon((74.856406461, 92), (77, 90.762395693), (77, 92), align=None)
    extrude(amount=VACIADO1_3_DEPTH)


solid = part.part
